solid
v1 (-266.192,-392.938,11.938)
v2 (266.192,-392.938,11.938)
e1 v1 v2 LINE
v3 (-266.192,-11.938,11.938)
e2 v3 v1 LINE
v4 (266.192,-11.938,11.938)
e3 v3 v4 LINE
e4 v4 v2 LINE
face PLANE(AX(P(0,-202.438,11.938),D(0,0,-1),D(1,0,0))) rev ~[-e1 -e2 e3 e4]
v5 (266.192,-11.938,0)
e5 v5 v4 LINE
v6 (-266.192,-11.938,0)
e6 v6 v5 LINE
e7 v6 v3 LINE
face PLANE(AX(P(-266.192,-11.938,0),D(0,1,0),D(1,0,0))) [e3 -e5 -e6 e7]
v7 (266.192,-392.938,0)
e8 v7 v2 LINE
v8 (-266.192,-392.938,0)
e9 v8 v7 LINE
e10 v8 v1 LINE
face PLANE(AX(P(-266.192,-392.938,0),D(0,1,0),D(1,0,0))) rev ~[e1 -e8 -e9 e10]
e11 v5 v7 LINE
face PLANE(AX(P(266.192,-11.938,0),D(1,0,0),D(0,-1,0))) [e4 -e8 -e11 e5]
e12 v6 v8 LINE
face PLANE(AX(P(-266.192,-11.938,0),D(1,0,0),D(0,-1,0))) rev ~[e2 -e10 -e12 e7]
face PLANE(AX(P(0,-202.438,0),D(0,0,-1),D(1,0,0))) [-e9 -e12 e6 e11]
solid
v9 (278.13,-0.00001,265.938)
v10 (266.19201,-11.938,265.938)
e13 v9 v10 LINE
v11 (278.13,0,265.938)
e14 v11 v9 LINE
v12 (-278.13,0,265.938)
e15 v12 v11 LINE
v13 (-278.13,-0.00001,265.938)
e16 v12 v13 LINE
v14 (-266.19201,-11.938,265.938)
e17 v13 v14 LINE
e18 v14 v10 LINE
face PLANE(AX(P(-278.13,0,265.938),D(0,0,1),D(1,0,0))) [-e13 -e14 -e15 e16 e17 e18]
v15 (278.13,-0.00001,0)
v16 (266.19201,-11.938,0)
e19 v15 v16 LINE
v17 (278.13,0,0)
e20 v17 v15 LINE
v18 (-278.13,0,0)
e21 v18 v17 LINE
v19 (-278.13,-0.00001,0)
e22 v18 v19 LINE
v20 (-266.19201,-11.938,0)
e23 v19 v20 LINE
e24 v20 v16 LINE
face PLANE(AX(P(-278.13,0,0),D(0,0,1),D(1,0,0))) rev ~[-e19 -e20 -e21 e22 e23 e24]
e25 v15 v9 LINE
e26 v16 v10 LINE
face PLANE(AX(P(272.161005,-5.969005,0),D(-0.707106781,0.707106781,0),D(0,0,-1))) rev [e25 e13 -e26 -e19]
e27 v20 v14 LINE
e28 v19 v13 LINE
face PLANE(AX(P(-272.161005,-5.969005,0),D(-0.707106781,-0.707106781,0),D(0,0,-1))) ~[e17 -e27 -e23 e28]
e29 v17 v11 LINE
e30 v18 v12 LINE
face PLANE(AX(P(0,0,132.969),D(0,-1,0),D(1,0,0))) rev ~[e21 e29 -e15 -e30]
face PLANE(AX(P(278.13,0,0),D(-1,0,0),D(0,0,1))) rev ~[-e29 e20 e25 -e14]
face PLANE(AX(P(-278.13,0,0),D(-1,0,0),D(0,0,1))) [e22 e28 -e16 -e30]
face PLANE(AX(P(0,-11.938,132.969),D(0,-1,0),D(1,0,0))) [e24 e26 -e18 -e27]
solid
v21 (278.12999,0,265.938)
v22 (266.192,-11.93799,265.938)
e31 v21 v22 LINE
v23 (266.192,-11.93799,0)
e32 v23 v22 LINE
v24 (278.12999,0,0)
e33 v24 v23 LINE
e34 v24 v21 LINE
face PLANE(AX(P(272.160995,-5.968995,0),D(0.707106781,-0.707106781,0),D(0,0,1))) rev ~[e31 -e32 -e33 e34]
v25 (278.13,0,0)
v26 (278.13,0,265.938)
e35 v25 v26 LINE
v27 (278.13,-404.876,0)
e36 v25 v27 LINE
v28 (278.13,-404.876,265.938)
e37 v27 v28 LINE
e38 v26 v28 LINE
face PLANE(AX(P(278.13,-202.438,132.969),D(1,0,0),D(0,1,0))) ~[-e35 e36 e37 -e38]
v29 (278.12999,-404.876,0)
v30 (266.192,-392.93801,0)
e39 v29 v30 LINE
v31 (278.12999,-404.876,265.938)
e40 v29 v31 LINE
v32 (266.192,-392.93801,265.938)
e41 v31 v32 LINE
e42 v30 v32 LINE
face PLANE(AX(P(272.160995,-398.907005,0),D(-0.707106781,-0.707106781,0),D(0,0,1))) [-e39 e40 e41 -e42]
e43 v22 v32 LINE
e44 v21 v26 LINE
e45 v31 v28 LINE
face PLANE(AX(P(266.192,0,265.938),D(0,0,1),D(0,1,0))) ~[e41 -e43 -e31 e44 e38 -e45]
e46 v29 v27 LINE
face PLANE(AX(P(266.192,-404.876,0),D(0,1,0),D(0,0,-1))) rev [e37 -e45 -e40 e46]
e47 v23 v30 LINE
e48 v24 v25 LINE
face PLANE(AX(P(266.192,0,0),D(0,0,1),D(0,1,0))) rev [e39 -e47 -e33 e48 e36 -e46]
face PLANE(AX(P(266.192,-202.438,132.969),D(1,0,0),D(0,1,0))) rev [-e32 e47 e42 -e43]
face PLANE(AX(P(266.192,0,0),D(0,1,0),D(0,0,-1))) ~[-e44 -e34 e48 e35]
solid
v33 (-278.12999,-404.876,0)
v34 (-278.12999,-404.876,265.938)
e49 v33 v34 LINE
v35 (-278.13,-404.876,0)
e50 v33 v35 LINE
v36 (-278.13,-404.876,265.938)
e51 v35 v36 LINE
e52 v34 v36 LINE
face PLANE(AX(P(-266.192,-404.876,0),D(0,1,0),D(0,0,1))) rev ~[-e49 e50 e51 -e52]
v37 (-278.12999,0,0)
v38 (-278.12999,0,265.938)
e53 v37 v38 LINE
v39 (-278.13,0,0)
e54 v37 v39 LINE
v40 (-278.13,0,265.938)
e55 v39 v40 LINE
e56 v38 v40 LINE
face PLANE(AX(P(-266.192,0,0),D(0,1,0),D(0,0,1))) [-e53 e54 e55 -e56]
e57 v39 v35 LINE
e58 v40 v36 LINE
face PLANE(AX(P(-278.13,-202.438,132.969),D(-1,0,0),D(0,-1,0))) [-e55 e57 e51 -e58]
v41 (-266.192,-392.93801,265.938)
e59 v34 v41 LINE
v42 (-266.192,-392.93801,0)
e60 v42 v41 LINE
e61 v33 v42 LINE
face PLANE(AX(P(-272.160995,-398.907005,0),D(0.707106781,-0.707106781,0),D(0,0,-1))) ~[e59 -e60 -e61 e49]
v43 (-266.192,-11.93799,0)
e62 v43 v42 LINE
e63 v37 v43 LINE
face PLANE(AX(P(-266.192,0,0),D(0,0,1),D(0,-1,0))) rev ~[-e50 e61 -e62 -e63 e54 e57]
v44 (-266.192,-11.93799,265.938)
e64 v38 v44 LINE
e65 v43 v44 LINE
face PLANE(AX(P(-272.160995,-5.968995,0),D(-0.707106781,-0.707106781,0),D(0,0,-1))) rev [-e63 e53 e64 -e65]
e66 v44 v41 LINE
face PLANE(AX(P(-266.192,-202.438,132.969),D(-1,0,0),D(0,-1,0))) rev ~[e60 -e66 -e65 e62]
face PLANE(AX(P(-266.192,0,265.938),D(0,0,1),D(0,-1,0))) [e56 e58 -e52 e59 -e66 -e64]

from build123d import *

# Parameters (mm, degrees)
F1_W      = 556.26
F1_H      = 265.938
F2_DEPTH  = 11.938
F3_W      = 532.384
F3_H      = 381
F4_DEPTH  = 11.938
F5_W      = 404.876
F5_H      = 265.938
F6_DEPTH  = 11.938
F8_SIZE   = 11.93799
F8_2_SIZE = 11.93799
F8_3_SIZE = 11.93799


# Not quite as in the source:
# - a variable given as a bare number and used for a length is read in inches; the dataset says mm whatever the document's units were
# - a fillet or chamfer is up to 0.001 mm smaller than in the source, because OpenCascade refuses the exact size


with BuildPart() as f2:
    # F1 (on Front) → F2 (new body)
    with BuildSketch(Plane.XZ):
        with Locations((0, 132.969)):
            Rectangle(F1_W, F1_H)
    extrude(amount=F2_DEPTH)

    # F8 (size 11.938 in the source; OpenCascade refuses exactly that, so slightly less here)
    f8_edges = [f2.edges().sort_by_distance(p)[0] for p in [
        (278.13, -11.938, 132.969),
        (-278.13, -11.938, 132.969),
    ]]
    chamfer(f8_edges, length=F8_SIZE)


with BuildPart() as f4:
    # F3 (on face) → F4 (new body)
    with BuildSketch(Plane(origin=(0, 0, 0), x_dir=(1, 0, 0), z_dir=(0, 0, -1))):
        with Locations((0, 202.438)):
            Rectangle(F3_W, F3_H)
    extrude(amount=-F4_DEPTH)


with BuildPart() as f6:
    # F5 (on face) → F6 (new body)
    with BuildSketch(Plane(origin=(-266.192, 0, 0), x_dir=(0, -1, 0), z_dir=(-1, 0, 0))):
        with Locations((202.438, 132.969)):
            Rectangle(F5_W, F5_H)
    extrude(amount=F6_DEPTH)


with BuildPart() as f7_1:
    # F7: instance of F6
    add(f6.part.mirror(Plane.YZ))

    # F8#2 (size 11.938 in the source; OpenCascade refuses exactly that, so slightly less here)
    f8_2_edges = [f7_1.edges().sort_by_distance(p)[0] for p in [
        (266.192, 0, 132.969),
        (266.192, -404.876, 132.969),
    ]]
    chamfer(f8_2_edges, length=F8_2_SIZE)


with BuildPart() as f6_1:
    add(f6.part)

    # F8#3 (size 11.938 in the source; OpenCascade refuses exactly that, so slightly less here)
    f8_3_edges = [f6_1.edges().sort_by_distance(p)[0] for p in [
        (-266.192, 0, 132.969),
        (-266.192, -404.876, 132.969),
    ]]
    chamfer(f8_3_edges, length=F8_3_SIZE)


solid = Compound([f2.part, f4.part, f7_1.part, f6_1.part])
